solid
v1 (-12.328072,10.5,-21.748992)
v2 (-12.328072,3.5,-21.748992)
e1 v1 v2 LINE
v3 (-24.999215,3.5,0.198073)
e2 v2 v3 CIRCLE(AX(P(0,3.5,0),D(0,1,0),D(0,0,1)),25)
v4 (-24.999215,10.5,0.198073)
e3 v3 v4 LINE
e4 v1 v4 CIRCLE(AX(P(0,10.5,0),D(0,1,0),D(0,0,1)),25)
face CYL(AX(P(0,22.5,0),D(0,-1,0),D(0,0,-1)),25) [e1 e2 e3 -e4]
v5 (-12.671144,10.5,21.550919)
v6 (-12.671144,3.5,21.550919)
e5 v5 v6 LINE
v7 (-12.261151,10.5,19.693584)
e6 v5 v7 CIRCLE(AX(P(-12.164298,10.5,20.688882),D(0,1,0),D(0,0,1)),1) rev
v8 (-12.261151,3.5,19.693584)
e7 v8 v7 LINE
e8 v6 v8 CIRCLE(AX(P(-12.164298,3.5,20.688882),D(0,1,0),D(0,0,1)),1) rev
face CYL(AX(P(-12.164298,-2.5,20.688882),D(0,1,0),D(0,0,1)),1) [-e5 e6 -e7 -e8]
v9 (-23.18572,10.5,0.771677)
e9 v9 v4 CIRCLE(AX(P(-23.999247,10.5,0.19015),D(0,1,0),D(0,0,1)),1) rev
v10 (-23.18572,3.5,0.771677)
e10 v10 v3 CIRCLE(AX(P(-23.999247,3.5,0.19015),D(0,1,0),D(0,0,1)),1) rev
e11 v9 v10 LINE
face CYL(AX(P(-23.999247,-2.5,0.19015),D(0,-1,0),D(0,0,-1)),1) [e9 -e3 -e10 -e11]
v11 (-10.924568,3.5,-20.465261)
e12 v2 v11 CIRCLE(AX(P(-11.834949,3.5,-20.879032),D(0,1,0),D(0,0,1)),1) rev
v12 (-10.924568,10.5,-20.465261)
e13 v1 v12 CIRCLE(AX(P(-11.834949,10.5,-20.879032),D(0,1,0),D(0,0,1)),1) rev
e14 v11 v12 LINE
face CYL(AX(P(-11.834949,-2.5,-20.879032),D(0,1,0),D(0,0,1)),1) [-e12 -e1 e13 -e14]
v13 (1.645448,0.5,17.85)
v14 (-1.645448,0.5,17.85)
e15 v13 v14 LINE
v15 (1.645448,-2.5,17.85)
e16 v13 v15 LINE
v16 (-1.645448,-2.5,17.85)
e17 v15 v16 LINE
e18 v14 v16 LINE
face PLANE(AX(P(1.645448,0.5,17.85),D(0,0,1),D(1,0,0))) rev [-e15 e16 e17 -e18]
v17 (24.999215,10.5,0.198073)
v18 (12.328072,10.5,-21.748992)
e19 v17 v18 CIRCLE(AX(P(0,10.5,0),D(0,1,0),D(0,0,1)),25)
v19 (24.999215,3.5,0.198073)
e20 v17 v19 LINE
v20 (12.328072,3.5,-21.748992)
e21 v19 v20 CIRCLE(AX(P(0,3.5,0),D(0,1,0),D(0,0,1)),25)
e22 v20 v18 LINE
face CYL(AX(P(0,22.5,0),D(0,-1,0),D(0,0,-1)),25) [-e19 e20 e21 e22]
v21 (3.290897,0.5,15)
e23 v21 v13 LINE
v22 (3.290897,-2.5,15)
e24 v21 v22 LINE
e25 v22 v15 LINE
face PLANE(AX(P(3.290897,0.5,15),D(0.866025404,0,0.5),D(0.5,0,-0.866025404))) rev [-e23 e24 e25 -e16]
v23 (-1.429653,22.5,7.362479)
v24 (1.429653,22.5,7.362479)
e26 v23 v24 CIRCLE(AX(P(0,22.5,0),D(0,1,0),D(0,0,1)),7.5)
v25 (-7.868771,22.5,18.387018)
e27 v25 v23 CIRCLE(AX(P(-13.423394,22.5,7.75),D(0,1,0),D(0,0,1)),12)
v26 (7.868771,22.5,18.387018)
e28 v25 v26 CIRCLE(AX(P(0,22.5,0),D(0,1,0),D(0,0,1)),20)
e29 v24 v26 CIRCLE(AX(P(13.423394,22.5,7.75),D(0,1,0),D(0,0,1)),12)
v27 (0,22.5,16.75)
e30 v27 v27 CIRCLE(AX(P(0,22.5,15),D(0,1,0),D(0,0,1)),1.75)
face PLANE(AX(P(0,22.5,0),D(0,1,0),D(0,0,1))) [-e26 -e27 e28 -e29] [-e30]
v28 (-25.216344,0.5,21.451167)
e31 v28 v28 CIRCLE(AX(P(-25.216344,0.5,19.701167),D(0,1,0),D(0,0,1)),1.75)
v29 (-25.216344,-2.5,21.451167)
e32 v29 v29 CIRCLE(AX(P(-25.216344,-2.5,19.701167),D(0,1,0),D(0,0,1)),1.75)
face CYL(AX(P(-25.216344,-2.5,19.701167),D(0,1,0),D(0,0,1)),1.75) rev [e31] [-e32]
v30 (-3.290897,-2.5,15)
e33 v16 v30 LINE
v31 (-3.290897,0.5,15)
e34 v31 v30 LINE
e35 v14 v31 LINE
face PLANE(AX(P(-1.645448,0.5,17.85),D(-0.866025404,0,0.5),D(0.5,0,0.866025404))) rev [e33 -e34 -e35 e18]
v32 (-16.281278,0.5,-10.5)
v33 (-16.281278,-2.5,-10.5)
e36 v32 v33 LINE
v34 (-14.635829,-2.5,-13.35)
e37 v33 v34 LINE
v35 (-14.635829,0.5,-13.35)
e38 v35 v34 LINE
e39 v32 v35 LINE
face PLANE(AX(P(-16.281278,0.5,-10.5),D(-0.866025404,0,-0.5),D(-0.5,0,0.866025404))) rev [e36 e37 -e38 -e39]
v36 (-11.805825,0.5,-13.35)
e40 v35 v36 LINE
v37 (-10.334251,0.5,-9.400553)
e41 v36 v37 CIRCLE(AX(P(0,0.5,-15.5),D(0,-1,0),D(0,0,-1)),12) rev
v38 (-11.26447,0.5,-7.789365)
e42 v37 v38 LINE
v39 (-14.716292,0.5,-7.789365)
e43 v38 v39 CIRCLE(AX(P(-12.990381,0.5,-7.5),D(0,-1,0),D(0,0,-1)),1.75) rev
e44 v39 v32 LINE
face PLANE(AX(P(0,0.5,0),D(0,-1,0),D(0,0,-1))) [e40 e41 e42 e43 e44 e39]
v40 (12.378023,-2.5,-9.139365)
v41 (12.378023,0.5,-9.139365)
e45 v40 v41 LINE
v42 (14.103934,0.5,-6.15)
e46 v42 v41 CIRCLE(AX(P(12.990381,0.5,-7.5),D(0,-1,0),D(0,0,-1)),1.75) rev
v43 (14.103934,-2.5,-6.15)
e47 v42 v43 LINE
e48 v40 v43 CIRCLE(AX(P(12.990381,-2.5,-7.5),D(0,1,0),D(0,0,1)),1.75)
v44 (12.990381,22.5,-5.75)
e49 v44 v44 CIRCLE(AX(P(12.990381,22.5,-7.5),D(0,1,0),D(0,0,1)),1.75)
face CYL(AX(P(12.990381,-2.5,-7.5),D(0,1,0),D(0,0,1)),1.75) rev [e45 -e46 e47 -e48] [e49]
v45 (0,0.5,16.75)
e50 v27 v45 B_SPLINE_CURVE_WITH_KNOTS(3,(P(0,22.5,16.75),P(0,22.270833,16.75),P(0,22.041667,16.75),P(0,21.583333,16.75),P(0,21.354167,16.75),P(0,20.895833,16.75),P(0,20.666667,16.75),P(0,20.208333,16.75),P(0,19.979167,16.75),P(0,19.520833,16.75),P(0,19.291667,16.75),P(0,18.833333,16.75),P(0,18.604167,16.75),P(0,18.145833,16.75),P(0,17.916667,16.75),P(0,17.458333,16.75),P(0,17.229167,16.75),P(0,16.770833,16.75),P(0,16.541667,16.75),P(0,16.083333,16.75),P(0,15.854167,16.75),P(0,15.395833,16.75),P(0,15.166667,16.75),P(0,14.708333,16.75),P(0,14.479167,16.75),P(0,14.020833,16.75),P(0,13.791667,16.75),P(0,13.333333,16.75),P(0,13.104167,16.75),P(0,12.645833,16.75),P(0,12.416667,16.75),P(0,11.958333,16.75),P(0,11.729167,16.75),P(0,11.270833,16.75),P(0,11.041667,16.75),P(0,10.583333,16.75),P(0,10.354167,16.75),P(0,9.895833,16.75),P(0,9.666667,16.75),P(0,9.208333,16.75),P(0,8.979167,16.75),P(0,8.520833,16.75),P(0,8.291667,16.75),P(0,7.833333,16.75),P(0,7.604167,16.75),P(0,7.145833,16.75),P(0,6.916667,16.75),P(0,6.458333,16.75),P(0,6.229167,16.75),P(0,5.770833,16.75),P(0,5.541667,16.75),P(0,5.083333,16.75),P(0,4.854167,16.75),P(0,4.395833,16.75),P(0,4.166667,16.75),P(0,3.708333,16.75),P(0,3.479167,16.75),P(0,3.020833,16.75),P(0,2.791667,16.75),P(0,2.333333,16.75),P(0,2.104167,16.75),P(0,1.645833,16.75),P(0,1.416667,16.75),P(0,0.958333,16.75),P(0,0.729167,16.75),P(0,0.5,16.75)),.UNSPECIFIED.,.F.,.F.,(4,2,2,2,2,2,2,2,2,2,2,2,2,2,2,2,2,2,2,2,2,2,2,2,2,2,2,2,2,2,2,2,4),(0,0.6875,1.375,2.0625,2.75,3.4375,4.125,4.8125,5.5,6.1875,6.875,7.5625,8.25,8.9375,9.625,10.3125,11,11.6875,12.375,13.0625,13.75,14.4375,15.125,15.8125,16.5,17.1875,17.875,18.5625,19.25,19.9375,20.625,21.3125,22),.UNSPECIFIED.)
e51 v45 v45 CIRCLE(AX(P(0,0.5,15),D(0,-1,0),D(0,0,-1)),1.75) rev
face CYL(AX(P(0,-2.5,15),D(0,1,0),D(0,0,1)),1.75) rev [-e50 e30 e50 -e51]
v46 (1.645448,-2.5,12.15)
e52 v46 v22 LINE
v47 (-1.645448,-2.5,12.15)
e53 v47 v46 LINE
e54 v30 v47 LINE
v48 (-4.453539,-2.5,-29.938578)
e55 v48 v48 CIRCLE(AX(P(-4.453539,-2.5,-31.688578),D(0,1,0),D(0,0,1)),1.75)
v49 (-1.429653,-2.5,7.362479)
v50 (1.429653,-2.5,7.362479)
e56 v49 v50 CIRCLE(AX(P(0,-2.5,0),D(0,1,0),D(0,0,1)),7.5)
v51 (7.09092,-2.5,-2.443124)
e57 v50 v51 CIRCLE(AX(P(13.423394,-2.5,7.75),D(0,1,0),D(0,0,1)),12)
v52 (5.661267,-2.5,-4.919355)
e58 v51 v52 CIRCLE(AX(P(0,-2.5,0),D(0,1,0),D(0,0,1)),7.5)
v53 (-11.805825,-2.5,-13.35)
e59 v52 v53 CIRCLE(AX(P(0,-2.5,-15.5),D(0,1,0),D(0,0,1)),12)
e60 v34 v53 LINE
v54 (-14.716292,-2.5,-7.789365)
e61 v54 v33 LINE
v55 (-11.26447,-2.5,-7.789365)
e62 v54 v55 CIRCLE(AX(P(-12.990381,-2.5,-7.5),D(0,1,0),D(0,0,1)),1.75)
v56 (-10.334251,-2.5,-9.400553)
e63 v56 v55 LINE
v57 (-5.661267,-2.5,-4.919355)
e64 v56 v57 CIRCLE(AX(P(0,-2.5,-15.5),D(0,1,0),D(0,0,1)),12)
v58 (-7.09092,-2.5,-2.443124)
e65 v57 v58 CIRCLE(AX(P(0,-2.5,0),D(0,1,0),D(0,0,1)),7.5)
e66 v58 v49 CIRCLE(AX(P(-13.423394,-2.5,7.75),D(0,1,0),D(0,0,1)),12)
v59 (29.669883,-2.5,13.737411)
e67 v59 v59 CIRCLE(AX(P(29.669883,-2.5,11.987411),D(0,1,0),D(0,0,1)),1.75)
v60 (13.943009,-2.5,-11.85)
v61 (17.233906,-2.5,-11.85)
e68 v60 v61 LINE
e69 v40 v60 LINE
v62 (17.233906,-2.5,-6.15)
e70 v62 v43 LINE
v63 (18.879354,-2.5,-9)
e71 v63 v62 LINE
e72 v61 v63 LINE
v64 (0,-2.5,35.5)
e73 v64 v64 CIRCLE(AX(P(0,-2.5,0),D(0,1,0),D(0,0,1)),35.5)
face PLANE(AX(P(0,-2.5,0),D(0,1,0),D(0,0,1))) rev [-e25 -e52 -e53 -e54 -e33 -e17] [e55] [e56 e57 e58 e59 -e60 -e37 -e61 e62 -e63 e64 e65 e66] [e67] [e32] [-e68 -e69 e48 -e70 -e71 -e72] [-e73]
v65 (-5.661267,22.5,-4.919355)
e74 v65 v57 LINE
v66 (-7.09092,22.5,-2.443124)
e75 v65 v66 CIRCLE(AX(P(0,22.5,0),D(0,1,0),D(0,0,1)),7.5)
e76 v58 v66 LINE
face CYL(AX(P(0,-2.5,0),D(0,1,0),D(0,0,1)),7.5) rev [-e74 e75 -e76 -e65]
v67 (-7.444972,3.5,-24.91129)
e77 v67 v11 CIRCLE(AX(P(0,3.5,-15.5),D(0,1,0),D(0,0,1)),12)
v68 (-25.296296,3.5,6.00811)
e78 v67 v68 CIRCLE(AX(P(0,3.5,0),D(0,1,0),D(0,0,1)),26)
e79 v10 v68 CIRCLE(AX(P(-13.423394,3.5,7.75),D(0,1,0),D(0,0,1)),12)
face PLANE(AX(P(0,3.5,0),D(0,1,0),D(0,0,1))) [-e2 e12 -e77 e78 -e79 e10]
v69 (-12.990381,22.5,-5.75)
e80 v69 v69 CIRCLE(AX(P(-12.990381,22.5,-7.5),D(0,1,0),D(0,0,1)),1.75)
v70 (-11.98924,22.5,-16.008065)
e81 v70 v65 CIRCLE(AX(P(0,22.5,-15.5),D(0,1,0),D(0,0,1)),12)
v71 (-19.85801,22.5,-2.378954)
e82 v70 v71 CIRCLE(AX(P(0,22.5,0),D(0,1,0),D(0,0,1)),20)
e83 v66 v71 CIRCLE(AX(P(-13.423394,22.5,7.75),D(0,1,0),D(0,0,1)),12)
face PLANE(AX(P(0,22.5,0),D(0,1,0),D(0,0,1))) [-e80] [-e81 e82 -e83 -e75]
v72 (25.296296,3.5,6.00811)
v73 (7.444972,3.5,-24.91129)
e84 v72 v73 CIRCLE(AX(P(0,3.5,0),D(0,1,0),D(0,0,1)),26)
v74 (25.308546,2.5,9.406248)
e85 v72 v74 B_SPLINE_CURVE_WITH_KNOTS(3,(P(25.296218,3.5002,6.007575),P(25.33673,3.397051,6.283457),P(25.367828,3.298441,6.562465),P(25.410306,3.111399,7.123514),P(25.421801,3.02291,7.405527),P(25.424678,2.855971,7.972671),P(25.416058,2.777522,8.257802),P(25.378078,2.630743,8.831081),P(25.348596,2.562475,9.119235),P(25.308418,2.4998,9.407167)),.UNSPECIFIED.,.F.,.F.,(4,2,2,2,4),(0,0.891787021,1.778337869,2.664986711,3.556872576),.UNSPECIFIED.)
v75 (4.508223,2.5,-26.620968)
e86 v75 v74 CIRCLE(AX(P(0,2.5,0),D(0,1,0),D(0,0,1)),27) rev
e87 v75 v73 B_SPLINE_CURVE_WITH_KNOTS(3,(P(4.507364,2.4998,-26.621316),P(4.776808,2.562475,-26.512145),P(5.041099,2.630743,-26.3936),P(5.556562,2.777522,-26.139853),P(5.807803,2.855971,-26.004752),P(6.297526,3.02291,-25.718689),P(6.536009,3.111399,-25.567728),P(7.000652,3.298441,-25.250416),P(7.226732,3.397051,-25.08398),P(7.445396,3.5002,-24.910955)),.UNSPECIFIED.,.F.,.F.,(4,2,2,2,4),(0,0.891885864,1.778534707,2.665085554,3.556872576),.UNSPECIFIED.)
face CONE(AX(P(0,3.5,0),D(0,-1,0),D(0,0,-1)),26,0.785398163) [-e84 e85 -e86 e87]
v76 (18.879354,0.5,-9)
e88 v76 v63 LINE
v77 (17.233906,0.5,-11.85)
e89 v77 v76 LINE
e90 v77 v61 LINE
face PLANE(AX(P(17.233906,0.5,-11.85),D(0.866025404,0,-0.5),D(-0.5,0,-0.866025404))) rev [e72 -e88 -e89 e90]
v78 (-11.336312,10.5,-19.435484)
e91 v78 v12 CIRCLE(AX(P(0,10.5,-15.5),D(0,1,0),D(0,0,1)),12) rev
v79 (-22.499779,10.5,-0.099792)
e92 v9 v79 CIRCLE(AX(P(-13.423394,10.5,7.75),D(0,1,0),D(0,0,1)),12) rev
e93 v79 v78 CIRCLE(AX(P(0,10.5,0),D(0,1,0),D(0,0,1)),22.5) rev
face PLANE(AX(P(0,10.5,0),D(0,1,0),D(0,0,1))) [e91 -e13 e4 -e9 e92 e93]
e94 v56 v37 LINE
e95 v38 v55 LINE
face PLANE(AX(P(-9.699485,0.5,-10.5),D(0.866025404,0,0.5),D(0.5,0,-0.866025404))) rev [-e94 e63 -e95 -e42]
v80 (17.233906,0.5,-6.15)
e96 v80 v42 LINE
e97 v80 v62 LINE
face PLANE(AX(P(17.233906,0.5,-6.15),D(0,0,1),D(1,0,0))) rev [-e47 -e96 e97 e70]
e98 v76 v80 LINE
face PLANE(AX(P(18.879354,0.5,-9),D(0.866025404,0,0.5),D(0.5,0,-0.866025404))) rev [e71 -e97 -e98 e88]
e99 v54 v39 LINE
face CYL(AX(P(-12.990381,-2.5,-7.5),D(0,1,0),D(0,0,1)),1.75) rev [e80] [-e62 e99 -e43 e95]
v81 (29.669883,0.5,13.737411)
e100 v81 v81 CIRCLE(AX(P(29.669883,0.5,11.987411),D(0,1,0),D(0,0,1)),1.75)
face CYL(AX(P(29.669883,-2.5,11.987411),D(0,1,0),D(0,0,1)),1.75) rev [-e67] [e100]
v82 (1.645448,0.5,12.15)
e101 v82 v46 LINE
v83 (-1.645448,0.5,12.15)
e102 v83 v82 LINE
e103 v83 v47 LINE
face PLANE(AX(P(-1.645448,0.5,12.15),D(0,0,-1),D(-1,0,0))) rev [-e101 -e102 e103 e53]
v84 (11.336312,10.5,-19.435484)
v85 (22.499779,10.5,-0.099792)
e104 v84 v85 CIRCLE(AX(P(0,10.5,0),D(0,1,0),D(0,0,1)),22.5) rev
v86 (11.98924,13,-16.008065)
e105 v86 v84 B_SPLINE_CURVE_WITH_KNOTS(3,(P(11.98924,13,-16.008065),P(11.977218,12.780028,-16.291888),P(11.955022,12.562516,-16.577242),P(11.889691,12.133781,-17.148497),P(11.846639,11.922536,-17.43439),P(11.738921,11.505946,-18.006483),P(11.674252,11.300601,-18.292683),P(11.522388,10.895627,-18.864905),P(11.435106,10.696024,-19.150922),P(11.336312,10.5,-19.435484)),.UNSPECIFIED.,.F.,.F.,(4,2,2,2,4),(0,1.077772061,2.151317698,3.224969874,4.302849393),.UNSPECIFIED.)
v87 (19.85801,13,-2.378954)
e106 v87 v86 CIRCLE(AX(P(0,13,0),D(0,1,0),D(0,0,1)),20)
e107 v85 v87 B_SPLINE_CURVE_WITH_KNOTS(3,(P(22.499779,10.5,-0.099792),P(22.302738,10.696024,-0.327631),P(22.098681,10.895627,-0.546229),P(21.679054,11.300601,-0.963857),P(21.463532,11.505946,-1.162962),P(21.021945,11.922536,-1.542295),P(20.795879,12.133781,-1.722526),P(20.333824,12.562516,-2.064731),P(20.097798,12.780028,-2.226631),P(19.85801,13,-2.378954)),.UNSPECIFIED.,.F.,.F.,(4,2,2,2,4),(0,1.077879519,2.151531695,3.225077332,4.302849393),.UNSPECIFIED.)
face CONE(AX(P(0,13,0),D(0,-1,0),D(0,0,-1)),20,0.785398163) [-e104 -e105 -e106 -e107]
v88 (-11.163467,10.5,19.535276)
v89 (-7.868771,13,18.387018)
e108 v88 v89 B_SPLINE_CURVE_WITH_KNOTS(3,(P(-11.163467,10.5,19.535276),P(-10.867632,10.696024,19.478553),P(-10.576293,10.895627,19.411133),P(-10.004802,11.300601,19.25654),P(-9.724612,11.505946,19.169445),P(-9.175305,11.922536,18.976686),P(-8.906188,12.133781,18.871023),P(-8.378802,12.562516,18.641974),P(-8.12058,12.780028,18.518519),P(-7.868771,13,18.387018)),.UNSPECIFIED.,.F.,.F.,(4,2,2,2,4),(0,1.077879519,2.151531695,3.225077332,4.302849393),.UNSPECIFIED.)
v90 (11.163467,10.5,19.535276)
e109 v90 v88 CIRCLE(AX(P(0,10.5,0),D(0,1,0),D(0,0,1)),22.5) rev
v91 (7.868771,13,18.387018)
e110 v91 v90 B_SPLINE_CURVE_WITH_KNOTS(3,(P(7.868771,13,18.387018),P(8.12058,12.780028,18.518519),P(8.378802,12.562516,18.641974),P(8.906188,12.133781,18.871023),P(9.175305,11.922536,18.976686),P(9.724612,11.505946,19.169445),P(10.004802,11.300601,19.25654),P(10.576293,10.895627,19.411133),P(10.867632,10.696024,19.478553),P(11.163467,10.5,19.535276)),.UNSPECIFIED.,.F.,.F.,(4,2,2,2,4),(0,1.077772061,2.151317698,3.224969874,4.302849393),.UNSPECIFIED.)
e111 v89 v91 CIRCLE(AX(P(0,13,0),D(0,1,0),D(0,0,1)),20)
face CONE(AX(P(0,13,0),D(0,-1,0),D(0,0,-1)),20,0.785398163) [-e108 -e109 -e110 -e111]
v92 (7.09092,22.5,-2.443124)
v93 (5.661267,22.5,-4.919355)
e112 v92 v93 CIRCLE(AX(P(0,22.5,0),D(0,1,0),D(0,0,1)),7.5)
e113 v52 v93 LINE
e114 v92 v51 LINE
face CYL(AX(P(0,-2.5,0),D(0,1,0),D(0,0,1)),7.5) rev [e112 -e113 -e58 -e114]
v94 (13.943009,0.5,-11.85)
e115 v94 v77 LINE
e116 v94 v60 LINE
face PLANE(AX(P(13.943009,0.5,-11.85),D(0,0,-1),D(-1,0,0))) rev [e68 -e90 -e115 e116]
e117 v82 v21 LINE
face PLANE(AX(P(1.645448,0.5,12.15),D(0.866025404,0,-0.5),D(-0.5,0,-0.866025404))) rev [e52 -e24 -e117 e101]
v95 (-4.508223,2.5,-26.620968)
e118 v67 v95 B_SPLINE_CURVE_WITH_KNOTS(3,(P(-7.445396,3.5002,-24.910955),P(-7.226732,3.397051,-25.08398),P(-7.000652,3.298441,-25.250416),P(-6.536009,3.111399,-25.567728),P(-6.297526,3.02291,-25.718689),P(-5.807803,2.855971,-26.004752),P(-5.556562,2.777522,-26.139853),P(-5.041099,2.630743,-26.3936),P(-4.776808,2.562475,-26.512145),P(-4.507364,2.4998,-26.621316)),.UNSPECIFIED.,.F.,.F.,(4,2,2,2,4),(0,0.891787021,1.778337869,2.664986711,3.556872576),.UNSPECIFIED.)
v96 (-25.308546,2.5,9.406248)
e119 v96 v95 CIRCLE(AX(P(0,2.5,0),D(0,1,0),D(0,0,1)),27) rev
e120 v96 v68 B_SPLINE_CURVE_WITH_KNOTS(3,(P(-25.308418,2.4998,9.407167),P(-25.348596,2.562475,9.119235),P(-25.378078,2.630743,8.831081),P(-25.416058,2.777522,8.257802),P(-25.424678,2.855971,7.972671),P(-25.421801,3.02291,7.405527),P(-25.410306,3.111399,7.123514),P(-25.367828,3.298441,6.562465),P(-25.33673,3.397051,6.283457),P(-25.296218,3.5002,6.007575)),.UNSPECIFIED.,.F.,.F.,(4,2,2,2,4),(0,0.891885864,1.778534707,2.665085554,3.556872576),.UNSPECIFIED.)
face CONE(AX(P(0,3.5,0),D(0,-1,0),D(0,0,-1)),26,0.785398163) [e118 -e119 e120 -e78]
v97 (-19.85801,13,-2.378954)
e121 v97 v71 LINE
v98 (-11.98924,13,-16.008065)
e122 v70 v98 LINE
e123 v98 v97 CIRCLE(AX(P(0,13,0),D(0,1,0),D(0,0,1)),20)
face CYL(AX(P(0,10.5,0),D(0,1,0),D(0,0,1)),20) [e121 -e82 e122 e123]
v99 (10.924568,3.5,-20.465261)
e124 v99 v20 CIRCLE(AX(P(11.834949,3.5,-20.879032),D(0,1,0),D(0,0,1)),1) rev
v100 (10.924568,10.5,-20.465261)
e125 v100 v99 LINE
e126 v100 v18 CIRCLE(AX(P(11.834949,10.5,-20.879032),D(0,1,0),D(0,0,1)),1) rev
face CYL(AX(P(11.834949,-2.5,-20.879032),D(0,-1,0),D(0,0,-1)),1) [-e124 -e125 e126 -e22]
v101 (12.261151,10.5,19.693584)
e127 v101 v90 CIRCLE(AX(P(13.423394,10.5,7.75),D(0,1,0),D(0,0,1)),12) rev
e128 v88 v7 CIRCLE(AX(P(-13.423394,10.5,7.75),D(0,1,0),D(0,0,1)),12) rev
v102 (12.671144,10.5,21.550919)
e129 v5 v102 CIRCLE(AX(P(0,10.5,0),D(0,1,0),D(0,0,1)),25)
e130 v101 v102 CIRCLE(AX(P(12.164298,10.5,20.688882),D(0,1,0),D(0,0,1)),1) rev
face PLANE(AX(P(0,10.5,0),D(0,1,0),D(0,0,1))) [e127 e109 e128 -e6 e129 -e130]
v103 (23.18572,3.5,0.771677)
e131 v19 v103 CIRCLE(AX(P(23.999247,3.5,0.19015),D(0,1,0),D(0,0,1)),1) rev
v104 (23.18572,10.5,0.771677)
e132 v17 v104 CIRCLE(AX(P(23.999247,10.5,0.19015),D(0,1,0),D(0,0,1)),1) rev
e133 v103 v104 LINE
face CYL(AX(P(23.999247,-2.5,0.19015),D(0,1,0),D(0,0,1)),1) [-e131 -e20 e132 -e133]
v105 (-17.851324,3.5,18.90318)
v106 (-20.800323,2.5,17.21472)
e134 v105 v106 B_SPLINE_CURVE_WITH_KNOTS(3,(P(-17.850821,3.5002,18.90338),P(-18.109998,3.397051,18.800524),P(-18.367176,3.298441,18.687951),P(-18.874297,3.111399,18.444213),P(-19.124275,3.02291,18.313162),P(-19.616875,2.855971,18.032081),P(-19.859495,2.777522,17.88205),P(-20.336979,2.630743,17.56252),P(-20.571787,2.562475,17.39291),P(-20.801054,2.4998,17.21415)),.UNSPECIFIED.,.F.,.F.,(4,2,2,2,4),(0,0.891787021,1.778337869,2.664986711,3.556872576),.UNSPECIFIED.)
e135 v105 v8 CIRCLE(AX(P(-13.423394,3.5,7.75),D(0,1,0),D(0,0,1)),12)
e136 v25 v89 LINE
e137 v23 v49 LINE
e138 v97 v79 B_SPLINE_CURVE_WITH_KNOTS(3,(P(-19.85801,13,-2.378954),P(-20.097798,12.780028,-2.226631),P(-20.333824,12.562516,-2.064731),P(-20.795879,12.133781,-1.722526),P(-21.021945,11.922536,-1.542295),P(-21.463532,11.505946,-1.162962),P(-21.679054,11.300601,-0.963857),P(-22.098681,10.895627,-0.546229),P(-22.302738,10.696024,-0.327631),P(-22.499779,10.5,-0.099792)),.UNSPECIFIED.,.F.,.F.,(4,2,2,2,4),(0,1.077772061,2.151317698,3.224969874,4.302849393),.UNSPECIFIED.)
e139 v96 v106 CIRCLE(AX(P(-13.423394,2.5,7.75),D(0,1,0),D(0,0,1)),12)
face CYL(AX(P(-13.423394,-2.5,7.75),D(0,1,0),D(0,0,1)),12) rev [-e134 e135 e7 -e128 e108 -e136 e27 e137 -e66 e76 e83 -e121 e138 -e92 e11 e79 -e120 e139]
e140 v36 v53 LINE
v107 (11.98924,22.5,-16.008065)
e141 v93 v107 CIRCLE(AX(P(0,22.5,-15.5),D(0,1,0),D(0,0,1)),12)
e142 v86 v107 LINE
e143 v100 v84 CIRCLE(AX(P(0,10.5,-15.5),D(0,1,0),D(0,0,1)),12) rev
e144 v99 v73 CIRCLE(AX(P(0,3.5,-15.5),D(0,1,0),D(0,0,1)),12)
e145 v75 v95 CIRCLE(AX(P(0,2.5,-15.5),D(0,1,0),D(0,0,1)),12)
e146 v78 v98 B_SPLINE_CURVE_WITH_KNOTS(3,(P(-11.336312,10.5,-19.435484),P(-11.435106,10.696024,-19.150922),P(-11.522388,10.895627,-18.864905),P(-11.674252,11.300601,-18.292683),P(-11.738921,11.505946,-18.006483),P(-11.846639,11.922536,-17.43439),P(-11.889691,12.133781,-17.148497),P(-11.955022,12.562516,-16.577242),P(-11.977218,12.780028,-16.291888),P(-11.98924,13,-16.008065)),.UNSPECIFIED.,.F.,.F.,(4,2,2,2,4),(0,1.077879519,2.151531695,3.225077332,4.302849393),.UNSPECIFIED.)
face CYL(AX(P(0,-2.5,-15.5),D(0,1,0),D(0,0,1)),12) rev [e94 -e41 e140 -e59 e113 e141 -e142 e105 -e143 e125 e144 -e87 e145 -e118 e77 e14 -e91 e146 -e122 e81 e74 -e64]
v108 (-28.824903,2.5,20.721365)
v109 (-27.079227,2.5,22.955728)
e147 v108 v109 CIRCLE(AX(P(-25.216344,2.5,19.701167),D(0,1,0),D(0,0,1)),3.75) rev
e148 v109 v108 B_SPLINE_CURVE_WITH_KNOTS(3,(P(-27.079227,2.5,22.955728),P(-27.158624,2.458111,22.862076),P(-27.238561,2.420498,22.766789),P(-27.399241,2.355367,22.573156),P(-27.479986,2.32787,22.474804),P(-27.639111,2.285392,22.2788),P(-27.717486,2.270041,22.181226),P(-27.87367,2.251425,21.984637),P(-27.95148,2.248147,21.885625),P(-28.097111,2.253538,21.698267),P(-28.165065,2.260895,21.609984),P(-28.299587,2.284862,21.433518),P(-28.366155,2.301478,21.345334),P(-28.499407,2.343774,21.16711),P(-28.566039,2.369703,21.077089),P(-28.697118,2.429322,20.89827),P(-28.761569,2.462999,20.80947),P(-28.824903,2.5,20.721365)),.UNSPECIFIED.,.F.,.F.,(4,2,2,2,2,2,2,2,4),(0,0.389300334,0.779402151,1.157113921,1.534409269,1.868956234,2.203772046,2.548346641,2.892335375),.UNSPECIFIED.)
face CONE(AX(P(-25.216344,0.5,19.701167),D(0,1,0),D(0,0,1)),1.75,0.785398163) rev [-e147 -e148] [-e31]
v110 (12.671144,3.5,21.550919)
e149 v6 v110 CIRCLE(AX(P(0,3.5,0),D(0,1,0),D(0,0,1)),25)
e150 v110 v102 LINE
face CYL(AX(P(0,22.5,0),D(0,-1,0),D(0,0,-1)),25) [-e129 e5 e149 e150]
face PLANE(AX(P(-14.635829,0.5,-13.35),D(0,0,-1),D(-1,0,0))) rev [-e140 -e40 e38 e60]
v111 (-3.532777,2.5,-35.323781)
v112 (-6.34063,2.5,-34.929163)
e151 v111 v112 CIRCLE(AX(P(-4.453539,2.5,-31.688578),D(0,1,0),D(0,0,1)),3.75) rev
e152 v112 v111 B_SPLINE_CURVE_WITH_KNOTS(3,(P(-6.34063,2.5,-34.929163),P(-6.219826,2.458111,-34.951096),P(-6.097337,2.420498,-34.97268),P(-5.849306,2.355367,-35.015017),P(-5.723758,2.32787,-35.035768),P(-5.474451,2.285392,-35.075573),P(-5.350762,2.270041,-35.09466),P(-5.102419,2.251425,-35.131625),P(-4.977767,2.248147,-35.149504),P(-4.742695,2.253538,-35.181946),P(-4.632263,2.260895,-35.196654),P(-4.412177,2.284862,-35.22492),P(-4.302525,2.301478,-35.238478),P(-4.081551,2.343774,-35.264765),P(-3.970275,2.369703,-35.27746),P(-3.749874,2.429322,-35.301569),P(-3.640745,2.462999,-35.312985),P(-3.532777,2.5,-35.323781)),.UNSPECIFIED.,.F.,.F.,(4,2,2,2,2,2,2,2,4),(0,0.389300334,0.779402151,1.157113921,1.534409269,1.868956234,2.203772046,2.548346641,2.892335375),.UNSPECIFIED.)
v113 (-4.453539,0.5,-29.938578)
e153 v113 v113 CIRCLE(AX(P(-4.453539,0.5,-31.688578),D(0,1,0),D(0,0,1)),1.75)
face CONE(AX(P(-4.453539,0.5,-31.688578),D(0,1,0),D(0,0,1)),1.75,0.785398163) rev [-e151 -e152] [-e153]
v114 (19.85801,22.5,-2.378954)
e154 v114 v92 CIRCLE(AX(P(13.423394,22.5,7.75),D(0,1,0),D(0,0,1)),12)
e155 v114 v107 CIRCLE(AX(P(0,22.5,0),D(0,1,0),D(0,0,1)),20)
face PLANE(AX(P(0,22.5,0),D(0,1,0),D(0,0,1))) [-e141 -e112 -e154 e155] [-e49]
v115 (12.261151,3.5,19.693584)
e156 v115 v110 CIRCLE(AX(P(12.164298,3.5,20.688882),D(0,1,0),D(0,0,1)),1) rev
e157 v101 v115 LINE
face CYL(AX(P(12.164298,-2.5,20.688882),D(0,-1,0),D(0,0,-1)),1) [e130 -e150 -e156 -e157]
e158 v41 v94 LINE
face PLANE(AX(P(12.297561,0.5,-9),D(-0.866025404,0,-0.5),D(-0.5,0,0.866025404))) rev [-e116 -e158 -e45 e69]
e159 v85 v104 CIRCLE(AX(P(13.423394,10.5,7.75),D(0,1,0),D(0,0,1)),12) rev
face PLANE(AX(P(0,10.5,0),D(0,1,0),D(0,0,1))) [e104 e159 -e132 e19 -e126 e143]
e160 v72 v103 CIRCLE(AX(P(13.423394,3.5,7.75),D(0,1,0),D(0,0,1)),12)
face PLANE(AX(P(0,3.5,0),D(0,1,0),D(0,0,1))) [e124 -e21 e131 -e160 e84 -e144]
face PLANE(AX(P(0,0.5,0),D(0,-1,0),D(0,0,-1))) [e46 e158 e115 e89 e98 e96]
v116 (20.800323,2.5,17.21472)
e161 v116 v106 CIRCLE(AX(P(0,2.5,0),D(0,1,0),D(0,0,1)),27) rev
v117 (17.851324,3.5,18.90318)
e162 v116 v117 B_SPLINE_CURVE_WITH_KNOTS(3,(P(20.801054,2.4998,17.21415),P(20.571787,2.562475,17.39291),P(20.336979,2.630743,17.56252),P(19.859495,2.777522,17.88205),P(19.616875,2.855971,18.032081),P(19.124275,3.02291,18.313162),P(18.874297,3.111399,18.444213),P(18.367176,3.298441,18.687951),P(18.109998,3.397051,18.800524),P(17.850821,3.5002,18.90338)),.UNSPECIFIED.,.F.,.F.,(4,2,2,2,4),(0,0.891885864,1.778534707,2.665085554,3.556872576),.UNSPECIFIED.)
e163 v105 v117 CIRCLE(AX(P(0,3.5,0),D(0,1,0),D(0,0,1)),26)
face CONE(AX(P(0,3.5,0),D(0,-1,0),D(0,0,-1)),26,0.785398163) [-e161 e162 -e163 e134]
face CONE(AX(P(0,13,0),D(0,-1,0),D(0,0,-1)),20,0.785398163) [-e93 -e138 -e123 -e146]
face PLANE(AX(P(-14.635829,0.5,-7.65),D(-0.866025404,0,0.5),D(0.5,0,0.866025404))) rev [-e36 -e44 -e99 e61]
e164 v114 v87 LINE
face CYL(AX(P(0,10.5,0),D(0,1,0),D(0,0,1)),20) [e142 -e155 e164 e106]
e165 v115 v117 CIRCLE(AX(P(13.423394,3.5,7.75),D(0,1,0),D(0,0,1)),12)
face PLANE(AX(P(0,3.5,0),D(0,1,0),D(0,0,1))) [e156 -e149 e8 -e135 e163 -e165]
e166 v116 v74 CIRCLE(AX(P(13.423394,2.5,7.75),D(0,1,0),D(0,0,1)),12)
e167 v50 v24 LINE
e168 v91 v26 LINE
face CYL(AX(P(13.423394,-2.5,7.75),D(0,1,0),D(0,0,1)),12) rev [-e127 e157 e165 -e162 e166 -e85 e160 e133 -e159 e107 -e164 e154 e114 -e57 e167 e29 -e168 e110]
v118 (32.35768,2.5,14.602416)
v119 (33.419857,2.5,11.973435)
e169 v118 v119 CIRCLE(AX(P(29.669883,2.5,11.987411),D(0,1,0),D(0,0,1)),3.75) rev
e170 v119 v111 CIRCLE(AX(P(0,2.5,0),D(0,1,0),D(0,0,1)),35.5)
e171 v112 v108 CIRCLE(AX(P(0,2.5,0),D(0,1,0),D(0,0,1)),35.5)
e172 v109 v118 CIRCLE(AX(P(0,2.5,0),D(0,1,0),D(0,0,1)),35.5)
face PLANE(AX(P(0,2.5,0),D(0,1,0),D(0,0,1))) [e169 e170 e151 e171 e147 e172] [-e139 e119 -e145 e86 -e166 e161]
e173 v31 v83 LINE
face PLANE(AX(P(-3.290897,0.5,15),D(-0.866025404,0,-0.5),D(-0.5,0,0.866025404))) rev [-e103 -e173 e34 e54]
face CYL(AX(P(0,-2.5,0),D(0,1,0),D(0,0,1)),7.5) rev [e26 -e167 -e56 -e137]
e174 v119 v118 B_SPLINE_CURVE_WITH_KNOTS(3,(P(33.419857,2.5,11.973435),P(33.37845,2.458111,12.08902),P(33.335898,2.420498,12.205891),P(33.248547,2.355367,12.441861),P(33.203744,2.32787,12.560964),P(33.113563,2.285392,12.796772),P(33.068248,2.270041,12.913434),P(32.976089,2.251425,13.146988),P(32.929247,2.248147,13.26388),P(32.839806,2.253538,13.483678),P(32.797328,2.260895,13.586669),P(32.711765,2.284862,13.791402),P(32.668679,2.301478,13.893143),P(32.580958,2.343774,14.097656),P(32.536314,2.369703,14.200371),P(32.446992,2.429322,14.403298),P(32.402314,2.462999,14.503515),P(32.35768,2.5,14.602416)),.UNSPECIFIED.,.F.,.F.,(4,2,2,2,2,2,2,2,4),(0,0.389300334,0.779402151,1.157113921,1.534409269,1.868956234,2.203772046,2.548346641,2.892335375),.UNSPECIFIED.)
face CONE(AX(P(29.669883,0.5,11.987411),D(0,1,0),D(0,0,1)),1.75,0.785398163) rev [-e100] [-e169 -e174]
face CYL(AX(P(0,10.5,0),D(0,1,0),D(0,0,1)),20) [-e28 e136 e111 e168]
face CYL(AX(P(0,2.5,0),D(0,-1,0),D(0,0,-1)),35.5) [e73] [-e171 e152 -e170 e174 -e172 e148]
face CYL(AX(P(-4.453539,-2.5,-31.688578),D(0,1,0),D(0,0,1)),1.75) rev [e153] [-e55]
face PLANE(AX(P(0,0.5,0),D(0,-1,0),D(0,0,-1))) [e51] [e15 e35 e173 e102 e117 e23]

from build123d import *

# Parameters (mm, degrees)
SKETCH1_R           = 35.5
BOSS_EXTRUDE1_DEPTH = 2.5
SKETCH2_R           = 26
BOSS_EXTRUDE2_DEPTH = 1
SKETCH3_R           = 25
BOSS_EXTRUDE3_DEPTH = 19
CHAMFER1_SIZE       = 1
SKETCH4_R           = 12
CUT_EXTRUDE1_DEPTH  = 57.084757288
SKETCH5_R           = 7.5
CUT_EXTRUDE2_DEPTH  = 57.084757332
FILLET1_R           = 1
SKETCH6_R           = 30.018937713
SKETCH6_R_2         = 20
CUT_EXTRUDE3_DEPTH  = 12
CHAMFER2_SIZE       = 2.5
SKETCH7_R           = 1.75
CUT_EXTRUDE4_DEPTH  = 57.084757332
CUT_EXTRUDE5_DEPTH  = 3
SKETCH9_R           = 1.75
CUT_EXTRUDE6_DEPTH  = 55.041650641
CHAMFER3_SIZE       = 2


# Some blends are built 0.0001 mm under size
with BuildPart() as part:
    # Sketch1 → Boss-Extrude1 (new, symmetric)
    with BuildSketch(Plane(origin=(0, 0, 0), x_dir=(1, 0, 0), z_dir=(0, 1, 0))):
        with Locations(Location((0, 0, 0), (0, 0, 270))):
            Circle(SKETCH1_R)
    extrude(amount=BOSS_EXTRUDE1_DEPTH, both=True)

    # Sketch2 → Boss-Extrude2 (add)
    with BuildSketch(Plane(origin=(0, 2.5, 0), x_dir=(1, 0, 0), z_dir=(0, 1, 0))):
        with Locations(Location((0, 0, 0), (0, 0, 270))):
            Circle(SKETCH2_R)
    extrude(amount=BOSS_EXTRUDE2_DEPTH)

    # Sketch3 → Boss-Extrude3 (add)
    with BuildSketch(Plane(origin=(0, 3.5, 0), x_dir=(1, 0, 0), z_dir=(0, 1, 0))):
        with Locations(Location((0, 0, 0), (0, 0, 270))):
            Circle(SKETCH3_R)
    extrude(amount=BOSS_EXTRUDE3_DEPTH)

    # Chamfer1
    chamfer1_edges = [part.edges().sort_by_distance(p)[0] for p in [
        (0, 2.5, -26),
    ]]
    chamfer(chamfer1_edges, length=CHAMFER1_SIZE - 0.0001)  # a hair under: the kernel refuses the full size

    # Sketch4 → Cut-Extrude1 (cut, through all)
    with BuildSketch(Plane(origin=(0, 22.5, 0), x_dir=(1, 0, 0), z_dir=(0, 1, 0))):
        with Locations(Location((0, 15.5, 0), (0, 0, 270))):
            Circle(SKETCH4_R)
        with Locations(Location((13.423393759, -7.75, 0), (0, 0, 270))):
            Circle(SKETCH4_R)
        with Locations(Location((-13.423393759, -7.75, 0), (0, 0, 270))):
            Circle(SKETCH4_R)
    extrude(amount=-CUT_EXTRUDE1_DEPTH, mode=Mode.SUBTRACT)

    # Sketch5 → Cut-Extrude2 (cut, through all)
    with BuildSketch(Plane(origin=(0, 22.5, 0), x_dir=(1, 0, 0), z_dir=(0, 1, 0))):
        Circle(SKETCH5_R)
    extrude(amount=-CUT_EXTRUDE2_DEPTH, mode=Mode.SUBTRACT)

    # Fillet1
    fillet1_edges = [part.edges().sort_by_distance(p)[0] for p in [
        (-15.575022283, 13, 19.555528141),
        (-24.723095296, 13, 3.710600891),
        (24.723095296, 13, 3.710600891),
        (15.575022283, 13, 19.555528141),
        (-9.148073013, 13, -23.266129032),
        (9.148073013, 13, -23.266129032),
    ]]
    fillet(fillet1_edges, radius=FILLET1_R)

    # Sketch6 → Cut-Extrude3 (cut)
    with BuildSketch(Plane(origin=(0, 22.5, 0), x_dir=(1, 0, 0), z_dir=(0, 1, 0))):
        Circle(SKETCH6_R)
        Circle(SKETCH6_R_2, mode=Mode.SUBTRACT)
    extrude(amount=-CUT_EXTRUDE3_DEPTH, mode=Mode.SUBTRACT)

    # Chamfer2
    chamfer2_edges = [part.edges().sort_by_distance(p)[0] for p in [
        (17.320508076, 10.5, -10),
        (-17.320508076, 10.5, -10),
        (0, 10.5, 20),
    ]]
    chamfer(chamfer2_edges, length=CHAMFER2_SIZE)

    # Sketch7 → Cut-Extrude4 (cut, through all)
    with BuildSketch(Plane(origin=(0, 22.5, 0), x_dir=(1, 0, 0), z_dir=(0, 1, 0))):
        with Locations(Location((0, -15, 0), (0, 0, 270))):
            Circle(SKETCH7_R)
        with Locations(Location((-12.990381057, 7.5, 0), (0, 0, 270))):
            Circle(SKETCH7_R)
        with Locations(Location((12.990381057, 7.5, 0), (0, 0, 270))):
            Circle(SKETCH7_R)
    extrude(amount=-CUT_EXTRUDE4_DEPTH, mode=Mode.SUBTRACT)

    # Sketch8 → Cut-Extrude5 (cut)
    with BuildSketch(Plane.XZ.offset(2.5)):
        Polygon((18.879353803, -9), (17.233905535, -6.15), (13.943009001, -6.15), (12.297560734, -9), (13.943009001, -11.85), (17.233905535, -11.85), align=None)
        Polygon((-1.645448267, 17.85), (-3.290896534, 15), (-1.645448267, 12.15), (1.645448267, 12.15), (3.290896534, 15), (1.645448267, 17.85), align=None)
        Polygon((-14.635829324, -13.35), (-11.34493279, -13.35), (-9.699484522, -10.5), (-11.34493279, -7.65), (-14.635829324, -7.65), (-16.281277591, -10.5), align=None)
    extrude(amount=-CUT_EXTRUDE5_DEPTH, mode=Mode.SUBTRACT)

    # Sketch9 → Cut-Extrude6 (cut, through all)
    with BuildSketch(Plane(origin=(0, 2.5, 0), x_dir=(1, 0, 0), z_dir=(0, 1, 0))):
        with Locations(Location((-4.453539231, 31.6885782, 0), (0, 0, 270))):
            Circle(SKETCH9_R)
        with Locations(Location((29.669883346, -11.987410989, 0), (0, 0, 270))):
            Circle(SKETCH9_R)
        with Locations(Location((-25.216344115, -19.70116721, 0), (0, 0, 270))):
            Circle(SKETCH9_R)
    extrude(amount=-CUT_EXTRUDE6_DEPTH, mode=Mode.SUBTRACT)

    # Chamfer3
    # the kernel refuses this chamfer: 2 mm, written as the material it takes off along each edge
    with BuildSketch(Plane(origin=(-4.453539231, 2.5, -31.6885782), x_dir=(0, 0, 1), z_dir=(-1, 0, 0))) as chamfer3_piece_1:
        Polygon((1.75 + CHAMFER3_SIZE, 0), (1.75, -CHAMFER3_SIZE), (1.75, 0), align=None)
    revolve(axis=Axis((-4.453539231, 2.5, -31.6885782), (0, 1, 0)), mode=Mode.SUBTRACT)
    with BuildSketch(Plane(origin=(29.669883346, 2.5, 11.987410989), x_dir=(0, 0, 1), z_dir=(-1, 0, 0))) as chamfer3_piece_2:
        Polygon((1.75 + CHAMFER3_SIZE, 0), (1.75, -CHAMFER3_SIZE), (1.75, 0), align=None)
    revolve(axis=Axis((29.669883346, 2.5, 11.987410989), (0, 1, 0)), mode=Mode.SUBTRACT)
    with BuildSketch(Plane(origin=(-25.216344115, 2.5, 19.70116721), x_dir=(0, 0, 1), z_dir=(-1, 0, 0))) as chamfer3_piece_3:
        Polygon((1.75 + CHAMFER3_SIZE, 0), (1.75, -CHAMFER3_SIZE), (1.75, 0), align=None)
    revolve(axis=Axis((-25.216344115, 2.5, 19.70116721), (0, 1, 0)), mode=Mode.SUBTRACT)


solid = part.part
